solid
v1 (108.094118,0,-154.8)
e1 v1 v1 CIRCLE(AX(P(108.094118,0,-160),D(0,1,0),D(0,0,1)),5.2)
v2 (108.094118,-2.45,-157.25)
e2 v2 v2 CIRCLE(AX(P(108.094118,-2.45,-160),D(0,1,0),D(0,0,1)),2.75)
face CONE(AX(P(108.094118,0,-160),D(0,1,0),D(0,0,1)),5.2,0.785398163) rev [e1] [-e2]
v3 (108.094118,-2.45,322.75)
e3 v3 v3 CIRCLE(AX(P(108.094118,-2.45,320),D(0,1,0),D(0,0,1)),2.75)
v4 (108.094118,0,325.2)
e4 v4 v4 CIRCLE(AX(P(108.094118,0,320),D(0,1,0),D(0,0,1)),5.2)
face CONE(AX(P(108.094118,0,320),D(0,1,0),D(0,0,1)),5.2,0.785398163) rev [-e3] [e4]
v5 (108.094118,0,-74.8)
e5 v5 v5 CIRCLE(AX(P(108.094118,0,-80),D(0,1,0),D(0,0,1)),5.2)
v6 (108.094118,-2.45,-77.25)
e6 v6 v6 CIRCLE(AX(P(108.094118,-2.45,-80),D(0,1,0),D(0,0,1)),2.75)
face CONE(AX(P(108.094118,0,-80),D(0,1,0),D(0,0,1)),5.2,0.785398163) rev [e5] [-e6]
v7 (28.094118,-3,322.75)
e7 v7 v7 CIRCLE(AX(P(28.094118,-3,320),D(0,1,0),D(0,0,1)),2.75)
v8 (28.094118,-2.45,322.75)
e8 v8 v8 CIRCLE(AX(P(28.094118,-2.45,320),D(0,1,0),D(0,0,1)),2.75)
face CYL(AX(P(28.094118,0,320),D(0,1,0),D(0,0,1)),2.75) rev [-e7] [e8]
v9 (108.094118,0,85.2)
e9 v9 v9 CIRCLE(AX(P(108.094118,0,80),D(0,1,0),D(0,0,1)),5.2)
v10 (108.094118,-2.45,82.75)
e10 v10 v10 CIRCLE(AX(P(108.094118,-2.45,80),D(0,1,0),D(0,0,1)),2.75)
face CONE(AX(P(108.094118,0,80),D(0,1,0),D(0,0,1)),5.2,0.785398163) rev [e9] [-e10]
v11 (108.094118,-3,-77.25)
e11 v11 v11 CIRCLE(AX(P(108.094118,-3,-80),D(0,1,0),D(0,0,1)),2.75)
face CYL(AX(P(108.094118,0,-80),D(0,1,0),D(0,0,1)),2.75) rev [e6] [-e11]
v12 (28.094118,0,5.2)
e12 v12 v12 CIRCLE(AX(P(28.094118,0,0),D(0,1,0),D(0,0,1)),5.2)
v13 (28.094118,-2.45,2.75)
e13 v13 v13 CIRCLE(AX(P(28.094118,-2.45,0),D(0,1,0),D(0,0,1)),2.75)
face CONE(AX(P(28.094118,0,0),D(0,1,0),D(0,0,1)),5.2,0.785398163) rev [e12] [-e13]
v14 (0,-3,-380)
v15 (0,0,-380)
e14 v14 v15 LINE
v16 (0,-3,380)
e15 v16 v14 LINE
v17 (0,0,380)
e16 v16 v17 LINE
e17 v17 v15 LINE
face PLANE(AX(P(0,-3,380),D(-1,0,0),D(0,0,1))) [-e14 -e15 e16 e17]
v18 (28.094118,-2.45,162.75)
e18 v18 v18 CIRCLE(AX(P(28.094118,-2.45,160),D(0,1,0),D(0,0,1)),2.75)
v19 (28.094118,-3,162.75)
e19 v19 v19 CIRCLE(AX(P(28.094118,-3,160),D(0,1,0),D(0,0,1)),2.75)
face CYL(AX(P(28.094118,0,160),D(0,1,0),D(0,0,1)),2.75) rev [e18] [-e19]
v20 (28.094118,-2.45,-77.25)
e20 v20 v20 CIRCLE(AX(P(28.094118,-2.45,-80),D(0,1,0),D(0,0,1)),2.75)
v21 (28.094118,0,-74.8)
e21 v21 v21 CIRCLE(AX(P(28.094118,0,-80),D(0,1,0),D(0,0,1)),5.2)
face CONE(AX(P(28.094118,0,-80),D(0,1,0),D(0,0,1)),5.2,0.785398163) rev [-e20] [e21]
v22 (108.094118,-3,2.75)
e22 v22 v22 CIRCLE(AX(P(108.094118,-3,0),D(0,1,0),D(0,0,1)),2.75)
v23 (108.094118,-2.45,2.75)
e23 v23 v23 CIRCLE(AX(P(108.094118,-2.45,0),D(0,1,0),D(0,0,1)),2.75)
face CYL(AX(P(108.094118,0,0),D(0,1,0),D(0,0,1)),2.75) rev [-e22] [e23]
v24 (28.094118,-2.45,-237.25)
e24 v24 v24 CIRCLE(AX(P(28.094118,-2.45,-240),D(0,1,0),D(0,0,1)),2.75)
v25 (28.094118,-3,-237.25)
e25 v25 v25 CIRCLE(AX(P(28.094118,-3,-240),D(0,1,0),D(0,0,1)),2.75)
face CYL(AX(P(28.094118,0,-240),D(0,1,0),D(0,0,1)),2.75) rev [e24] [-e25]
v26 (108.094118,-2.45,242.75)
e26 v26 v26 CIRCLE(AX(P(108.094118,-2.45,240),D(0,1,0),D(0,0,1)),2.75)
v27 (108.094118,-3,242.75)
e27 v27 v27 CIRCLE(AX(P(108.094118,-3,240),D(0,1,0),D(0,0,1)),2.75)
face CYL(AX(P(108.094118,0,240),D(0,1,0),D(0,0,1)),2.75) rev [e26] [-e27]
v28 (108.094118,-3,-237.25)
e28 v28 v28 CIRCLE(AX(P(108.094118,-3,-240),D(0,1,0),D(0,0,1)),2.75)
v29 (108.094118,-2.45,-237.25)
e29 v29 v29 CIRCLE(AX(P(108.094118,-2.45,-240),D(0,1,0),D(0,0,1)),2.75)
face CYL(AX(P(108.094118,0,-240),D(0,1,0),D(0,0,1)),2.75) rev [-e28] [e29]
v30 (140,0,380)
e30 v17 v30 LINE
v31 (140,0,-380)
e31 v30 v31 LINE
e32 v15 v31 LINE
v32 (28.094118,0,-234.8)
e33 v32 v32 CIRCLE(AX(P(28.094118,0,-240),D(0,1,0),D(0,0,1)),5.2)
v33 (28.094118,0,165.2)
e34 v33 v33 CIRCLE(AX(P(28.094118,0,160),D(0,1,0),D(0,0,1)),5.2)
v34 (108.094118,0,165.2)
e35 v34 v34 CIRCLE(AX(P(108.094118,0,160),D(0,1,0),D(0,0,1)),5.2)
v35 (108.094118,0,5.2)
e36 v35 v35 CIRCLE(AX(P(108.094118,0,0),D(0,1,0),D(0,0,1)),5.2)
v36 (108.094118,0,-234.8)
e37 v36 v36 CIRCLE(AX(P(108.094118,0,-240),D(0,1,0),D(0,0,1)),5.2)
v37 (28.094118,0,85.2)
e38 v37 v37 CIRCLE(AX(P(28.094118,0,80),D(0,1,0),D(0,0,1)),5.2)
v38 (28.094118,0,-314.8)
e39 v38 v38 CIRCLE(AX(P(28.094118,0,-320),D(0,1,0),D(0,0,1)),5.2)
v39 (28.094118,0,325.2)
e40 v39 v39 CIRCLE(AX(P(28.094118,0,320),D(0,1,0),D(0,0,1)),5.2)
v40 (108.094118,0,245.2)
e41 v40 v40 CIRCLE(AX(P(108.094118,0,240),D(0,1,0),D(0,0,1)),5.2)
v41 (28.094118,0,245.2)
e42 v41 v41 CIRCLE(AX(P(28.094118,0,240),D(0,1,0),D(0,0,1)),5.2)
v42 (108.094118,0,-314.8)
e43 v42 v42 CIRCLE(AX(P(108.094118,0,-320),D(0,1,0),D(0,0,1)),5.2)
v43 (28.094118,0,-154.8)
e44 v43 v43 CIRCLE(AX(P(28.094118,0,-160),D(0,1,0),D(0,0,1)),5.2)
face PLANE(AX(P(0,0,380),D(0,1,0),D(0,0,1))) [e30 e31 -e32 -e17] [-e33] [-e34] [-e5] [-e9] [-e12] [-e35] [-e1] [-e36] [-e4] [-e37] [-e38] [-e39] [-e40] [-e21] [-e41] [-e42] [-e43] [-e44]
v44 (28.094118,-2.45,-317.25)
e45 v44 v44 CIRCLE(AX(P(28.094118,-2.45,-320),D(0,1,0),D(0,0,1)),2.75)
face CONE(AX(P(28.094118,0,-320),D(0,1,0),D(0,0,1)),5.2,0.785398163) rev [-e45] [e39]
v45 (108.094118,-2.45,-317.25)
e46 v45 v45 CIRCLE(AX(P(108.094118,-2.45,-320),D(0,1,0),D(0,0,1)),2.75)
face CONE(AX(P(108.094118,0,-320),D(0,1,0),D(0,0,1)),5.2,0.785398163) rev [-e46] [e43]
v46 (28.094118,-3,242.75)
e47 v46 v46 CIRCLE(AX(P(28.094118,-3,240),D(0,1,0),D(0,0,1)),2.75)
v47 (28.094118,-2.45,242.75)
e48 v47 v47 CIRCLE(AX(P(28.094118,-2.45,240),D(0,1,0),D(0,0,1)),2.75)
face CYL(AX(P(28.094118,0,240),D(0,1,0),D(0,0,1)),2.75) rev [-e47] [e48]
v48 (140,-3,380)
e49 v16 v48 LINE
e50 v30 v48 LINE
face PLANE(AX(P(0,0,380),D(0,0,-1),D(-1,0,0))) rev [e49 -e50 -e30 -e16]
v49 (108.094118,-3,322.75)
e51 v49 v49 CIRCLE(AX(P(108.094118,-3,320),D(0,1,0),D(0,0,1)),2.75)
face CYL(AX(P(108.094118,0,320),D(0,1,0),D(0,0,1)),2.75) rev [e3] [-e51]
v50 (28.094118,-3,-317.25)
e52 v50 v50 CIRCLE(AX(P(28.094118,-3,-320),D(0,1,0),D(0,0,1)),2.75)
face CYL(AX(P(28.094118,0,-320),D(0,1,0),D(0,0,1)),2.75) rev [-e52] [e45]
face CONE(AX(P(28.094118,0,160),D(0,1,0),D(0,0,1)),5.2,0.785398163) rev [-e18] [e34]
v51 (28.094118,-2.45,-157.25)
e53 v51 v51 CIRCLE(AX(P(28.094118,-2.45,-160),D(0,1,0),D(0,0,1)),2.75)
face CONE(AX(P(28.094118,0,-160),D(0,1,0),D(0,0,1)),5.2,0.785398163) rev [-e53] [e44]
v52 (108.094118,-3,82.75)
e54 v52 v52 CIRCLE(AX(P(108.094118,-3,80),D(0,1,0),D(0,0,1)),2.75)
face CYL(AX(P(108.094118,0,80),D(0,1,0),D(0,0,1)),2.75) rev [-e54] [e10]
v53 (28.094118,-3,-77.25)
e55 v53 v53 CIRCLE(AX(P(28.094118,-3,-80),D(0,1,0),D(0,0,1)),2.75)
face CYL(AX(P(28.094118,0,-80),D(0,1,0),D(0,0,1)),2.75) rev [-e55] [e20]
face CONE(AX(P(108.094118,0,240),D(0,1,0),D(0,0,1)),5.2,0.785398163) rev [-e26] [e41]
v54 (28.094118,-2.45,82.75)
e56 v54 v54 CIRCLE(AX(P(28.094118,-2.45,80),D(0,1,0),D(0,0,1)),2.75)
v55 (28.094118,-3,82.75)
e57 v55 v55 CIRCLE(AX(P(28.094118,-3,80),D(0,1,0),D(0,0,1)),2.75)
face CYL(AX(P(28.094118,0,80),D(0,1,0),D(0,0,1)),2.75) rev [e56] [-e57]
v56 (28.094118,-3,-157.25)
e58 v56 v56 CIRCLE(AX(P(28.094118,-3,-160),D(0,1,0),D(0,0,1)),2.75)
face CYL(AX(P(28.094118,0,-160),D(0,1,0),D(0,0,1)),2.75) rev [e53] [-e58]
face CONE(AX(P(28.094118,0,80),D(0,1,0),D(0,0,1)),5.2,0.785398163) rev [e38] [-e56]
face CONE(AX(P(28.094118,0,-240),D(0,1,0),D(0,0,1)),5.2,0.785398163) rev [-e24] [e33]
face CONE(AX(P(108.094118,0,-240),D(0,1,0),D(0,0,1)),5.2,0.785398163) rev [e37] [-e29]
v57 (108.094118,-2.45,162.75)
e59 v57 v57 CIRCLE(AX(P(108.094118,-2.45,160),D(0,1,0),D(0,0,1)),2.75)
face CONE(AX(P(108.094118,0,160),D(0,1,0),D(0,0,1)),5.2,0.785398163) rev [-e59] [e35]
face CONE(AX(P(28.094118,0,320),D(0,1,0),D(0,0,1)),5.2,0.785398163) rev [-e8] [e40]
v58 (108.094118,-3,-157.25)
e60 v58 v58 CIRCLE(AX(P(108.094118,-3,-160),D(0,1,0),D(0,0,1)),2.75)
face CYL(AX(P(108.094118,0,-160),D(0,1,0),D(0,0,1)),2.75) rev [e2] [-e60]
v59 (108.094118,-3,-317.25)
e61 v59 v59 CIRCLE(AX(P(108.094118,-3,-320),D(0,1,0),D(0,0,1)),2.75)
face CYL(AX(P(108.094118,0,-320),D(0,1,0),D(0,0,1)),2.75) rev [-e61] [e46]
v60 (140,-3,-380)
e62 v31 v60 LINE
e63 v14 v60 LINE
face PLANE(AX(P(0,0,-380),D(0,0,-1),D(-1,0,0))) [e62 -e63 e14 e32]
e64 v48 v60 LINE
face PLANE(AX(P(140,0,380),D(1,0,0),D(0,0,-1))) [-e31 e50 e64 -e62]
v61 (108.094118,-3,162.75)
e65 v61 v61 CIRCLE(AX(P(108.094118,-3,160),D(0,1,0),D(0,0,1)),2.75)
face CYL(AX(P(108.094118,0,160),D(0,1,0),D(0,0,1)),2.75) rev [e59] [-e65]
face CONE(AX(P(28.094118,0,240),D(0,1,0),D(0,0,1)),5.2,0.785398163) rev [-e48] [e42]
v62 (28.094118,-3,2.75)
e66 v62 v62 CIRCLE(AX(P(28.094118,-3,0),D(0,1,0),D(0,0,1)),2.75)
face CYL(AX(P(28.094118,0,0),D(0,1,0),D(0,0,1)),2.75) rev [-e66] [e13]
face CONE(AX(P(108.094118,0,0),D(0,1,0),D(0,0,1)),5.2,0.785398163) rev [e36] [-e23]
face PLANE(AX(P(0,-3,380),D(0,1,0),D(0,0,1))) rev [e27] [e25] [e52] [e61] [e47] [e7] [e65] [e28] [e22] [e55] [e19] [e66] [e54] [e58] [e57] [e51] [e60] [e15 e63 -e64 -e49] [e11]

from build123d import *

# Parameters (mm, degrees)
BASE_FLANGE1_START                           = -380
BASE_FLANGE1_OUTLINE_W                       = 140
BASE_FLANGE1_OUTLINE_H                       = 3
BASE_FLANGE1_DEPTH                           = 760
CSK_FOR_M5_COUNTERSUNK_FLAT_HEAD_SCR_2_COUNT = 2
CSK_FOR_M5_COUNTERSUNK_FLAT_HEAD_SCR_2_PITCH = 80
CSK_FOR_M5_COUNTERSUNK_FLAT_HEAD_SCR_3_COUNT = 2
CSK_FOR_M5_COUNTERSUNK_FLAT_HEAD_SCR_3_PITCH = 160
CSK_FOR_M5_COUNTERSUNK_FLAT_HEAD_SCR_4_COUNT = 2
CSK_FOR_M5_COUNTERSUNK_FLAT_HEAD_SCR_4_PITCH = 240
CSK_FOR_M5_COUNTERSUNK_FLAT_HEAD_SCR_5_COUNT = 2
CSK_FOR_M5_COUNTERSUNK_FLAT_HEAD_SCR_5_PITCH = 320
CSK_FOR_M5_COUNTERSUNK_FLAT_HEAD_SCR_6_COUNT = 2
CSK_FOR_M5_COUNTERSUNK_FLAT_HEAD_SCR_6_PITCH = 80
CSK_FOR_M5_COUNTERSUNK_FLAT_HEAD_SCR_7_COUNT = 2
CSK_FOR_M5_COUNTERSUNK_FLAT_HEAD_SCR_7_PITCH = 160
CSK_FOR_M5_COUNTERSUNK_FLAT_HEAD_SCR_8_COUNT = 2
CSK_FOR_M5_COUNTERSUNK_FLAT_HEAD_SCR_8_PITCH = 240
CSK_FOR_M5_COUNTERSUNK_FLAT_HEAD_SCR_9_COUNT = 2
CSK_FOR_M5_COUNTERSUNK_FLAT_HEAD_SCR_9_PITCH = 320
CRVPATTERN1_COUNT                            = 2
CRVPATTERN1_PITCH                            = 80


# Read off the part's stored shape, not the designer's step: Base-Flange1
with BuildPart() as part:
    # Base-Flange1 outline → Base-Flange1 (new body)
    with BuildSketch(Plane.XY.offset(BASE_FLANGE1_START)):
        with Locations((70, -1.5)):
            Rectangle(BASE_FLANGE1_OUTLINE_W, BASE_FLANGE1_OUTLINE_H)
    extrude(amount=BASE_FLANGE1_DEPTH)

    # Sketch7 → CSK for M5 Countersunk Flat Head Screw1 (revolve, cut)
    with BuildSketch(Plane(origin=(28.094118078, 0, 0), x_dir=(0, 0, 1), z_dir=(1, 0, 0))):
        Polygon((0, 0), (0, 3), (2.75, 3), (2.75, 2.45), (5.2, 0), align=None)
    csk_for_m5_countersunk_flat_head_screw1 = revolve(axis=Axis((28.094118078, 6.35, 0), (0, -1, 0)), mode=Mode.SUBTRACT)

    # CSK for M5 Countersunk Flat Head Scr 2: CSK for M5 Countersunk Flat Head Screw1 ×2
    with Locations(*[(0, 0, -i * CSK_FOR_M5_COUNTERSUNK_FLAT_HEAD_SCR_2_PITCH) for i in range(1, CSK_FOR_M5_COUNTERSUNK_FLAT_HEAD_SCR_2_COUNT)]):
        add(csk_for_m5_countersunk_flat_head_screw1, mode=Mode.SUBTRACT)

    # CSK for M5 Countersunk Flat Head Scr 3: CSK for M5 Countersunk Flat Head Screw1 ×2
    with Locations(*[(0, 0, -i * CSK_FOR_M5_COUNTERSUNK_FLAT_HEAD_SCR_3_PITCH) for i in range(1, CSK_FOR_M5_COUNTERSUNK_FLAT_HEAD_SCR_3_COUNT)]):
        add(csk_for_m5_countersunk_flat_head_screw1, mode=Mode.SUBTRACT)

    # CSK for M5 Countersunk Flat Head Scr 4: CSK for M5 Countersunk Flat Head Screw1 ×2
    with Locations(*[(0, 0, -i * CSK_FOR_M5_COUNTERSUNK_FLAT_HEAD_SCR_4_PITCH) for i in range(1, CSK_FOR_M5_COUNTERSUNK_FLAT_HEAD_SCR_4_COUNT)]):
        add(csk_for_m5_countersunk_flat_head_screw1, mode=Mode.SUBTRACT)

    # CSK for M5 Countersunk Flat Head Scr 5: CSK for M5 Countersunk Flat Head Screw1 ×2
    with Locations(*[(0, 0, -i * CSK_FOR_M5_COUNTERSUNK_FLAT_HEAD_SCR_5_PITCH) for i in range(1, CSK_FOR_M5_COUNTERSUNK_FLAT_HEAD_SCR_5_COUNT)]):
        add(csk_for_m5_countersunk_flat_head_screw1, mode=Mode.SUBTRACT)

    # CSK for M5 Countersunk Flat Head Scr 6: CSK for M5 Countersunk Flat Head Screw1 ×2
    with Locations(*[(0, 0, i * CSK_FOR_M5_COUNTERSUNK_FLAT_HEAD_SCR_6_PITCH) for i in range(1, CSK_FOR_M5_COUNTERSUNK_FLAT_HEAD_SCR_6_COUNT)]):
        add(csk_for_m5_countersunk_flat_head_screw1, mode=Mode.SUBTRACT)

    # CSK for M5 Countersunk Flat Head Scr 7: CSK for M5 Countersunk Flat Head Screw1 ×2
    with Locations(*[(0, 0, i * CSK_FOR_M5_COUNTERSUNK_FLAT_HEAD_SCR_7_PITCH) for i in range(1, CSK_FOR_M5_COUNTERSUNK_FLAT_HEAD_SCR_7_COUNT)]):
        add(csk_for_m5_countersunk_flat_head_screw1, mode=Mode.SUBTRACT)

    # CSK for M5 Countersunk Flat Head Scr 8: CSK for M5 Countersunk Flat Head Screw1 ×2
    with Locations(*[(0, 0, i * CSK_FOR_M5_COUNTERSUNK_FLAT_HEAD_SCR_8_PITCH) for i in range(1, CSK_FOR_M5_COUNTERSUNK_FLAT_HEAD_SCR_8_COUNT)]):
        add(csk_for_m5_countersunk_flat_head_screw1, mode=Mode.SUBTRACT)

    # CSK for M5 Countersunk Flat Head Scr 9: CSK for M5 Countersunk Flat Head Screw1 ×2
    with Locations(*[(0, 0, i * CSK_FOR_M5_COUNTERSUNK_FLAT_HEAD_SCR_9_PITCH) for i in range(1, CSK_FOR_M5_COUNTERSUNK_FLAT_HEAD_SCR_9_COUNT)]):
        add(csk_for_m5_countersunk_flat_head_screw1, mode=Mode.SUBTRACT)

    # CrvPattern1: CSK for M5 Countersunk Flat Head Screw1 ×2
    with Locations(*[(i * CRVPATTERN1_PITCH, 0, 0) for i in range(1, CRVPATTERN1_COUNT)]):
        add(csk_for_m5_countersunk_flat_head_screw1, mode=Mode.SUBTRACT)

    # CrvPattern1 copy 1 sketch → CrvPattern1 copy 1 (revolve, cut)
    with BuildSketch(Plane(origin=(108.094118078, 0, -80), x_dir=(0, 0, 1), z_dir=(1, 0, 0))):
        Polygon((0, 0), (0, 3), (2.75, 3), (2.75, 2.45), (5.2, 0), align=None)
    revolve(axis=Axis((108.094118078, 6.35, -80), (0, -1, 0)), mode=Mode.SUBTRACT)

    # CrvPattern1 copy 2 sketch → CrvPattern1 copy 2 (revolve, cut)
    with BuildSketch(Plane(origin=(108.094118078, 0, -160), x_dir=(0, 0, 1), z_dir=(1, 0, 0))):
        Polygon((0, 0), (0, 3), (2.75, 3), (2.75, 2.45), (5.2, 0), align=None)
    revolve(axis=Axis((108.094118078, 6.35, -160), (0, -1, 0)), mode=Mode.SUBTRACT)

    # CrvPattern1 copy 3 sketch → CrvPattern1 copy 3 (revolve, cut)
    with BuildSketch(Plane(origin=(108.094118078, 0, -240), x_dir=(0, 0, 1), z_dir=(1, 0, 0))):
        Polygon((0, 0), (0, 3), (2.75, 3), (2.75, 2.45), (5.2, 0), align=None)
    revolve(axis=Axis((108.094118078, 6.35, -240), (0, -1, 0)), mode=Mode.SUBTRACT)

    # CrvPattern1 copy 4 sketch → CrvPattern1 copy 4 (revolve, cut)
    with BuildSketch(Plane(origin=(108.094118078, 0, -320), x_dir=(0, 0, 1), z_dir=(1, 0, 0))):
        Polygon((0, 0), (0, 3), (2.75, 3), (2.75, 2.45), (5.2, 0), align=None)
    revolve(axis=Axis((108.094118078, 6.35, -320), (0, -1, 0)), mode=Mode.SUBTRACT)

    # CrvPattern1 copy 5 sketch → CrvPattern1 copy 5 (revolve, cut)
    with BuildSketch(Plane(origin=(108.094118078, 0, 80), x_dir=(0, 0, 1), z_dir=(1, 0, 0))):
        Polygon((0, 0), (0, 3), (2.75, 3), (2.75, 2.45), (5.2, 0), align=None)
    revolve(axis=Axis((108.094118078, 6.35, 80), (0, -1, 0)), mode=Mode.SUBTRACT)

    # CrvPattern1 copy 6 sketch → CrvPattern1 copy 6 (revolve, cut)
    with BuildSketch(Plane(origin=(108.094118078, 0, 160), x_dir=(0, 0, 1), z_dir=(1, 0, 0))):
        Polygon((0, 0), (0, 3), (2.75, 3), (2.75, 2.45), (5.2, 0), align=None)
    revolve(axis=Axis((108.094118078, 6.35, 160), (0, -1, 0)), mode=Mode.SUBTRACT)

    # CrvPattern1 copy 7 sketch → CrvPattern1 copy 7 (revolve, cut)
    with BuildSketch(Plane(origin=(108.094118078, 0, 240), x_dir=(0, 0, 1), z_dir=(1, 0, 0))):
        Polygon((0, 0), (0, 3), (2.75, 3), (2.75, 2.45), (5.2, 0), align=None)
    revolve(axis=Axis((108.094118078, 6.35, 240), (0, -1, 0)), mode=Mode.SUBTRACT)

    # CrvPattern1 copy 8 sketch → CrvPattern1 copy 8 (revolve, cut)
    with BuildSketch(Plane(origin=(108.094118078, 0, 320), x_dir=(0, 0, 1), z_dir=(1, 0, 0))):
        Polygon((0, 0), (0, 3), (2.75, 3), (2.75, 2.45), (5.2, 0), align=None)
    revolve(axis=Axis((108.094118078, 6.35, 320), (0, -1, 0)), mode=Mode.SUBTRACT)


solid = part.part
